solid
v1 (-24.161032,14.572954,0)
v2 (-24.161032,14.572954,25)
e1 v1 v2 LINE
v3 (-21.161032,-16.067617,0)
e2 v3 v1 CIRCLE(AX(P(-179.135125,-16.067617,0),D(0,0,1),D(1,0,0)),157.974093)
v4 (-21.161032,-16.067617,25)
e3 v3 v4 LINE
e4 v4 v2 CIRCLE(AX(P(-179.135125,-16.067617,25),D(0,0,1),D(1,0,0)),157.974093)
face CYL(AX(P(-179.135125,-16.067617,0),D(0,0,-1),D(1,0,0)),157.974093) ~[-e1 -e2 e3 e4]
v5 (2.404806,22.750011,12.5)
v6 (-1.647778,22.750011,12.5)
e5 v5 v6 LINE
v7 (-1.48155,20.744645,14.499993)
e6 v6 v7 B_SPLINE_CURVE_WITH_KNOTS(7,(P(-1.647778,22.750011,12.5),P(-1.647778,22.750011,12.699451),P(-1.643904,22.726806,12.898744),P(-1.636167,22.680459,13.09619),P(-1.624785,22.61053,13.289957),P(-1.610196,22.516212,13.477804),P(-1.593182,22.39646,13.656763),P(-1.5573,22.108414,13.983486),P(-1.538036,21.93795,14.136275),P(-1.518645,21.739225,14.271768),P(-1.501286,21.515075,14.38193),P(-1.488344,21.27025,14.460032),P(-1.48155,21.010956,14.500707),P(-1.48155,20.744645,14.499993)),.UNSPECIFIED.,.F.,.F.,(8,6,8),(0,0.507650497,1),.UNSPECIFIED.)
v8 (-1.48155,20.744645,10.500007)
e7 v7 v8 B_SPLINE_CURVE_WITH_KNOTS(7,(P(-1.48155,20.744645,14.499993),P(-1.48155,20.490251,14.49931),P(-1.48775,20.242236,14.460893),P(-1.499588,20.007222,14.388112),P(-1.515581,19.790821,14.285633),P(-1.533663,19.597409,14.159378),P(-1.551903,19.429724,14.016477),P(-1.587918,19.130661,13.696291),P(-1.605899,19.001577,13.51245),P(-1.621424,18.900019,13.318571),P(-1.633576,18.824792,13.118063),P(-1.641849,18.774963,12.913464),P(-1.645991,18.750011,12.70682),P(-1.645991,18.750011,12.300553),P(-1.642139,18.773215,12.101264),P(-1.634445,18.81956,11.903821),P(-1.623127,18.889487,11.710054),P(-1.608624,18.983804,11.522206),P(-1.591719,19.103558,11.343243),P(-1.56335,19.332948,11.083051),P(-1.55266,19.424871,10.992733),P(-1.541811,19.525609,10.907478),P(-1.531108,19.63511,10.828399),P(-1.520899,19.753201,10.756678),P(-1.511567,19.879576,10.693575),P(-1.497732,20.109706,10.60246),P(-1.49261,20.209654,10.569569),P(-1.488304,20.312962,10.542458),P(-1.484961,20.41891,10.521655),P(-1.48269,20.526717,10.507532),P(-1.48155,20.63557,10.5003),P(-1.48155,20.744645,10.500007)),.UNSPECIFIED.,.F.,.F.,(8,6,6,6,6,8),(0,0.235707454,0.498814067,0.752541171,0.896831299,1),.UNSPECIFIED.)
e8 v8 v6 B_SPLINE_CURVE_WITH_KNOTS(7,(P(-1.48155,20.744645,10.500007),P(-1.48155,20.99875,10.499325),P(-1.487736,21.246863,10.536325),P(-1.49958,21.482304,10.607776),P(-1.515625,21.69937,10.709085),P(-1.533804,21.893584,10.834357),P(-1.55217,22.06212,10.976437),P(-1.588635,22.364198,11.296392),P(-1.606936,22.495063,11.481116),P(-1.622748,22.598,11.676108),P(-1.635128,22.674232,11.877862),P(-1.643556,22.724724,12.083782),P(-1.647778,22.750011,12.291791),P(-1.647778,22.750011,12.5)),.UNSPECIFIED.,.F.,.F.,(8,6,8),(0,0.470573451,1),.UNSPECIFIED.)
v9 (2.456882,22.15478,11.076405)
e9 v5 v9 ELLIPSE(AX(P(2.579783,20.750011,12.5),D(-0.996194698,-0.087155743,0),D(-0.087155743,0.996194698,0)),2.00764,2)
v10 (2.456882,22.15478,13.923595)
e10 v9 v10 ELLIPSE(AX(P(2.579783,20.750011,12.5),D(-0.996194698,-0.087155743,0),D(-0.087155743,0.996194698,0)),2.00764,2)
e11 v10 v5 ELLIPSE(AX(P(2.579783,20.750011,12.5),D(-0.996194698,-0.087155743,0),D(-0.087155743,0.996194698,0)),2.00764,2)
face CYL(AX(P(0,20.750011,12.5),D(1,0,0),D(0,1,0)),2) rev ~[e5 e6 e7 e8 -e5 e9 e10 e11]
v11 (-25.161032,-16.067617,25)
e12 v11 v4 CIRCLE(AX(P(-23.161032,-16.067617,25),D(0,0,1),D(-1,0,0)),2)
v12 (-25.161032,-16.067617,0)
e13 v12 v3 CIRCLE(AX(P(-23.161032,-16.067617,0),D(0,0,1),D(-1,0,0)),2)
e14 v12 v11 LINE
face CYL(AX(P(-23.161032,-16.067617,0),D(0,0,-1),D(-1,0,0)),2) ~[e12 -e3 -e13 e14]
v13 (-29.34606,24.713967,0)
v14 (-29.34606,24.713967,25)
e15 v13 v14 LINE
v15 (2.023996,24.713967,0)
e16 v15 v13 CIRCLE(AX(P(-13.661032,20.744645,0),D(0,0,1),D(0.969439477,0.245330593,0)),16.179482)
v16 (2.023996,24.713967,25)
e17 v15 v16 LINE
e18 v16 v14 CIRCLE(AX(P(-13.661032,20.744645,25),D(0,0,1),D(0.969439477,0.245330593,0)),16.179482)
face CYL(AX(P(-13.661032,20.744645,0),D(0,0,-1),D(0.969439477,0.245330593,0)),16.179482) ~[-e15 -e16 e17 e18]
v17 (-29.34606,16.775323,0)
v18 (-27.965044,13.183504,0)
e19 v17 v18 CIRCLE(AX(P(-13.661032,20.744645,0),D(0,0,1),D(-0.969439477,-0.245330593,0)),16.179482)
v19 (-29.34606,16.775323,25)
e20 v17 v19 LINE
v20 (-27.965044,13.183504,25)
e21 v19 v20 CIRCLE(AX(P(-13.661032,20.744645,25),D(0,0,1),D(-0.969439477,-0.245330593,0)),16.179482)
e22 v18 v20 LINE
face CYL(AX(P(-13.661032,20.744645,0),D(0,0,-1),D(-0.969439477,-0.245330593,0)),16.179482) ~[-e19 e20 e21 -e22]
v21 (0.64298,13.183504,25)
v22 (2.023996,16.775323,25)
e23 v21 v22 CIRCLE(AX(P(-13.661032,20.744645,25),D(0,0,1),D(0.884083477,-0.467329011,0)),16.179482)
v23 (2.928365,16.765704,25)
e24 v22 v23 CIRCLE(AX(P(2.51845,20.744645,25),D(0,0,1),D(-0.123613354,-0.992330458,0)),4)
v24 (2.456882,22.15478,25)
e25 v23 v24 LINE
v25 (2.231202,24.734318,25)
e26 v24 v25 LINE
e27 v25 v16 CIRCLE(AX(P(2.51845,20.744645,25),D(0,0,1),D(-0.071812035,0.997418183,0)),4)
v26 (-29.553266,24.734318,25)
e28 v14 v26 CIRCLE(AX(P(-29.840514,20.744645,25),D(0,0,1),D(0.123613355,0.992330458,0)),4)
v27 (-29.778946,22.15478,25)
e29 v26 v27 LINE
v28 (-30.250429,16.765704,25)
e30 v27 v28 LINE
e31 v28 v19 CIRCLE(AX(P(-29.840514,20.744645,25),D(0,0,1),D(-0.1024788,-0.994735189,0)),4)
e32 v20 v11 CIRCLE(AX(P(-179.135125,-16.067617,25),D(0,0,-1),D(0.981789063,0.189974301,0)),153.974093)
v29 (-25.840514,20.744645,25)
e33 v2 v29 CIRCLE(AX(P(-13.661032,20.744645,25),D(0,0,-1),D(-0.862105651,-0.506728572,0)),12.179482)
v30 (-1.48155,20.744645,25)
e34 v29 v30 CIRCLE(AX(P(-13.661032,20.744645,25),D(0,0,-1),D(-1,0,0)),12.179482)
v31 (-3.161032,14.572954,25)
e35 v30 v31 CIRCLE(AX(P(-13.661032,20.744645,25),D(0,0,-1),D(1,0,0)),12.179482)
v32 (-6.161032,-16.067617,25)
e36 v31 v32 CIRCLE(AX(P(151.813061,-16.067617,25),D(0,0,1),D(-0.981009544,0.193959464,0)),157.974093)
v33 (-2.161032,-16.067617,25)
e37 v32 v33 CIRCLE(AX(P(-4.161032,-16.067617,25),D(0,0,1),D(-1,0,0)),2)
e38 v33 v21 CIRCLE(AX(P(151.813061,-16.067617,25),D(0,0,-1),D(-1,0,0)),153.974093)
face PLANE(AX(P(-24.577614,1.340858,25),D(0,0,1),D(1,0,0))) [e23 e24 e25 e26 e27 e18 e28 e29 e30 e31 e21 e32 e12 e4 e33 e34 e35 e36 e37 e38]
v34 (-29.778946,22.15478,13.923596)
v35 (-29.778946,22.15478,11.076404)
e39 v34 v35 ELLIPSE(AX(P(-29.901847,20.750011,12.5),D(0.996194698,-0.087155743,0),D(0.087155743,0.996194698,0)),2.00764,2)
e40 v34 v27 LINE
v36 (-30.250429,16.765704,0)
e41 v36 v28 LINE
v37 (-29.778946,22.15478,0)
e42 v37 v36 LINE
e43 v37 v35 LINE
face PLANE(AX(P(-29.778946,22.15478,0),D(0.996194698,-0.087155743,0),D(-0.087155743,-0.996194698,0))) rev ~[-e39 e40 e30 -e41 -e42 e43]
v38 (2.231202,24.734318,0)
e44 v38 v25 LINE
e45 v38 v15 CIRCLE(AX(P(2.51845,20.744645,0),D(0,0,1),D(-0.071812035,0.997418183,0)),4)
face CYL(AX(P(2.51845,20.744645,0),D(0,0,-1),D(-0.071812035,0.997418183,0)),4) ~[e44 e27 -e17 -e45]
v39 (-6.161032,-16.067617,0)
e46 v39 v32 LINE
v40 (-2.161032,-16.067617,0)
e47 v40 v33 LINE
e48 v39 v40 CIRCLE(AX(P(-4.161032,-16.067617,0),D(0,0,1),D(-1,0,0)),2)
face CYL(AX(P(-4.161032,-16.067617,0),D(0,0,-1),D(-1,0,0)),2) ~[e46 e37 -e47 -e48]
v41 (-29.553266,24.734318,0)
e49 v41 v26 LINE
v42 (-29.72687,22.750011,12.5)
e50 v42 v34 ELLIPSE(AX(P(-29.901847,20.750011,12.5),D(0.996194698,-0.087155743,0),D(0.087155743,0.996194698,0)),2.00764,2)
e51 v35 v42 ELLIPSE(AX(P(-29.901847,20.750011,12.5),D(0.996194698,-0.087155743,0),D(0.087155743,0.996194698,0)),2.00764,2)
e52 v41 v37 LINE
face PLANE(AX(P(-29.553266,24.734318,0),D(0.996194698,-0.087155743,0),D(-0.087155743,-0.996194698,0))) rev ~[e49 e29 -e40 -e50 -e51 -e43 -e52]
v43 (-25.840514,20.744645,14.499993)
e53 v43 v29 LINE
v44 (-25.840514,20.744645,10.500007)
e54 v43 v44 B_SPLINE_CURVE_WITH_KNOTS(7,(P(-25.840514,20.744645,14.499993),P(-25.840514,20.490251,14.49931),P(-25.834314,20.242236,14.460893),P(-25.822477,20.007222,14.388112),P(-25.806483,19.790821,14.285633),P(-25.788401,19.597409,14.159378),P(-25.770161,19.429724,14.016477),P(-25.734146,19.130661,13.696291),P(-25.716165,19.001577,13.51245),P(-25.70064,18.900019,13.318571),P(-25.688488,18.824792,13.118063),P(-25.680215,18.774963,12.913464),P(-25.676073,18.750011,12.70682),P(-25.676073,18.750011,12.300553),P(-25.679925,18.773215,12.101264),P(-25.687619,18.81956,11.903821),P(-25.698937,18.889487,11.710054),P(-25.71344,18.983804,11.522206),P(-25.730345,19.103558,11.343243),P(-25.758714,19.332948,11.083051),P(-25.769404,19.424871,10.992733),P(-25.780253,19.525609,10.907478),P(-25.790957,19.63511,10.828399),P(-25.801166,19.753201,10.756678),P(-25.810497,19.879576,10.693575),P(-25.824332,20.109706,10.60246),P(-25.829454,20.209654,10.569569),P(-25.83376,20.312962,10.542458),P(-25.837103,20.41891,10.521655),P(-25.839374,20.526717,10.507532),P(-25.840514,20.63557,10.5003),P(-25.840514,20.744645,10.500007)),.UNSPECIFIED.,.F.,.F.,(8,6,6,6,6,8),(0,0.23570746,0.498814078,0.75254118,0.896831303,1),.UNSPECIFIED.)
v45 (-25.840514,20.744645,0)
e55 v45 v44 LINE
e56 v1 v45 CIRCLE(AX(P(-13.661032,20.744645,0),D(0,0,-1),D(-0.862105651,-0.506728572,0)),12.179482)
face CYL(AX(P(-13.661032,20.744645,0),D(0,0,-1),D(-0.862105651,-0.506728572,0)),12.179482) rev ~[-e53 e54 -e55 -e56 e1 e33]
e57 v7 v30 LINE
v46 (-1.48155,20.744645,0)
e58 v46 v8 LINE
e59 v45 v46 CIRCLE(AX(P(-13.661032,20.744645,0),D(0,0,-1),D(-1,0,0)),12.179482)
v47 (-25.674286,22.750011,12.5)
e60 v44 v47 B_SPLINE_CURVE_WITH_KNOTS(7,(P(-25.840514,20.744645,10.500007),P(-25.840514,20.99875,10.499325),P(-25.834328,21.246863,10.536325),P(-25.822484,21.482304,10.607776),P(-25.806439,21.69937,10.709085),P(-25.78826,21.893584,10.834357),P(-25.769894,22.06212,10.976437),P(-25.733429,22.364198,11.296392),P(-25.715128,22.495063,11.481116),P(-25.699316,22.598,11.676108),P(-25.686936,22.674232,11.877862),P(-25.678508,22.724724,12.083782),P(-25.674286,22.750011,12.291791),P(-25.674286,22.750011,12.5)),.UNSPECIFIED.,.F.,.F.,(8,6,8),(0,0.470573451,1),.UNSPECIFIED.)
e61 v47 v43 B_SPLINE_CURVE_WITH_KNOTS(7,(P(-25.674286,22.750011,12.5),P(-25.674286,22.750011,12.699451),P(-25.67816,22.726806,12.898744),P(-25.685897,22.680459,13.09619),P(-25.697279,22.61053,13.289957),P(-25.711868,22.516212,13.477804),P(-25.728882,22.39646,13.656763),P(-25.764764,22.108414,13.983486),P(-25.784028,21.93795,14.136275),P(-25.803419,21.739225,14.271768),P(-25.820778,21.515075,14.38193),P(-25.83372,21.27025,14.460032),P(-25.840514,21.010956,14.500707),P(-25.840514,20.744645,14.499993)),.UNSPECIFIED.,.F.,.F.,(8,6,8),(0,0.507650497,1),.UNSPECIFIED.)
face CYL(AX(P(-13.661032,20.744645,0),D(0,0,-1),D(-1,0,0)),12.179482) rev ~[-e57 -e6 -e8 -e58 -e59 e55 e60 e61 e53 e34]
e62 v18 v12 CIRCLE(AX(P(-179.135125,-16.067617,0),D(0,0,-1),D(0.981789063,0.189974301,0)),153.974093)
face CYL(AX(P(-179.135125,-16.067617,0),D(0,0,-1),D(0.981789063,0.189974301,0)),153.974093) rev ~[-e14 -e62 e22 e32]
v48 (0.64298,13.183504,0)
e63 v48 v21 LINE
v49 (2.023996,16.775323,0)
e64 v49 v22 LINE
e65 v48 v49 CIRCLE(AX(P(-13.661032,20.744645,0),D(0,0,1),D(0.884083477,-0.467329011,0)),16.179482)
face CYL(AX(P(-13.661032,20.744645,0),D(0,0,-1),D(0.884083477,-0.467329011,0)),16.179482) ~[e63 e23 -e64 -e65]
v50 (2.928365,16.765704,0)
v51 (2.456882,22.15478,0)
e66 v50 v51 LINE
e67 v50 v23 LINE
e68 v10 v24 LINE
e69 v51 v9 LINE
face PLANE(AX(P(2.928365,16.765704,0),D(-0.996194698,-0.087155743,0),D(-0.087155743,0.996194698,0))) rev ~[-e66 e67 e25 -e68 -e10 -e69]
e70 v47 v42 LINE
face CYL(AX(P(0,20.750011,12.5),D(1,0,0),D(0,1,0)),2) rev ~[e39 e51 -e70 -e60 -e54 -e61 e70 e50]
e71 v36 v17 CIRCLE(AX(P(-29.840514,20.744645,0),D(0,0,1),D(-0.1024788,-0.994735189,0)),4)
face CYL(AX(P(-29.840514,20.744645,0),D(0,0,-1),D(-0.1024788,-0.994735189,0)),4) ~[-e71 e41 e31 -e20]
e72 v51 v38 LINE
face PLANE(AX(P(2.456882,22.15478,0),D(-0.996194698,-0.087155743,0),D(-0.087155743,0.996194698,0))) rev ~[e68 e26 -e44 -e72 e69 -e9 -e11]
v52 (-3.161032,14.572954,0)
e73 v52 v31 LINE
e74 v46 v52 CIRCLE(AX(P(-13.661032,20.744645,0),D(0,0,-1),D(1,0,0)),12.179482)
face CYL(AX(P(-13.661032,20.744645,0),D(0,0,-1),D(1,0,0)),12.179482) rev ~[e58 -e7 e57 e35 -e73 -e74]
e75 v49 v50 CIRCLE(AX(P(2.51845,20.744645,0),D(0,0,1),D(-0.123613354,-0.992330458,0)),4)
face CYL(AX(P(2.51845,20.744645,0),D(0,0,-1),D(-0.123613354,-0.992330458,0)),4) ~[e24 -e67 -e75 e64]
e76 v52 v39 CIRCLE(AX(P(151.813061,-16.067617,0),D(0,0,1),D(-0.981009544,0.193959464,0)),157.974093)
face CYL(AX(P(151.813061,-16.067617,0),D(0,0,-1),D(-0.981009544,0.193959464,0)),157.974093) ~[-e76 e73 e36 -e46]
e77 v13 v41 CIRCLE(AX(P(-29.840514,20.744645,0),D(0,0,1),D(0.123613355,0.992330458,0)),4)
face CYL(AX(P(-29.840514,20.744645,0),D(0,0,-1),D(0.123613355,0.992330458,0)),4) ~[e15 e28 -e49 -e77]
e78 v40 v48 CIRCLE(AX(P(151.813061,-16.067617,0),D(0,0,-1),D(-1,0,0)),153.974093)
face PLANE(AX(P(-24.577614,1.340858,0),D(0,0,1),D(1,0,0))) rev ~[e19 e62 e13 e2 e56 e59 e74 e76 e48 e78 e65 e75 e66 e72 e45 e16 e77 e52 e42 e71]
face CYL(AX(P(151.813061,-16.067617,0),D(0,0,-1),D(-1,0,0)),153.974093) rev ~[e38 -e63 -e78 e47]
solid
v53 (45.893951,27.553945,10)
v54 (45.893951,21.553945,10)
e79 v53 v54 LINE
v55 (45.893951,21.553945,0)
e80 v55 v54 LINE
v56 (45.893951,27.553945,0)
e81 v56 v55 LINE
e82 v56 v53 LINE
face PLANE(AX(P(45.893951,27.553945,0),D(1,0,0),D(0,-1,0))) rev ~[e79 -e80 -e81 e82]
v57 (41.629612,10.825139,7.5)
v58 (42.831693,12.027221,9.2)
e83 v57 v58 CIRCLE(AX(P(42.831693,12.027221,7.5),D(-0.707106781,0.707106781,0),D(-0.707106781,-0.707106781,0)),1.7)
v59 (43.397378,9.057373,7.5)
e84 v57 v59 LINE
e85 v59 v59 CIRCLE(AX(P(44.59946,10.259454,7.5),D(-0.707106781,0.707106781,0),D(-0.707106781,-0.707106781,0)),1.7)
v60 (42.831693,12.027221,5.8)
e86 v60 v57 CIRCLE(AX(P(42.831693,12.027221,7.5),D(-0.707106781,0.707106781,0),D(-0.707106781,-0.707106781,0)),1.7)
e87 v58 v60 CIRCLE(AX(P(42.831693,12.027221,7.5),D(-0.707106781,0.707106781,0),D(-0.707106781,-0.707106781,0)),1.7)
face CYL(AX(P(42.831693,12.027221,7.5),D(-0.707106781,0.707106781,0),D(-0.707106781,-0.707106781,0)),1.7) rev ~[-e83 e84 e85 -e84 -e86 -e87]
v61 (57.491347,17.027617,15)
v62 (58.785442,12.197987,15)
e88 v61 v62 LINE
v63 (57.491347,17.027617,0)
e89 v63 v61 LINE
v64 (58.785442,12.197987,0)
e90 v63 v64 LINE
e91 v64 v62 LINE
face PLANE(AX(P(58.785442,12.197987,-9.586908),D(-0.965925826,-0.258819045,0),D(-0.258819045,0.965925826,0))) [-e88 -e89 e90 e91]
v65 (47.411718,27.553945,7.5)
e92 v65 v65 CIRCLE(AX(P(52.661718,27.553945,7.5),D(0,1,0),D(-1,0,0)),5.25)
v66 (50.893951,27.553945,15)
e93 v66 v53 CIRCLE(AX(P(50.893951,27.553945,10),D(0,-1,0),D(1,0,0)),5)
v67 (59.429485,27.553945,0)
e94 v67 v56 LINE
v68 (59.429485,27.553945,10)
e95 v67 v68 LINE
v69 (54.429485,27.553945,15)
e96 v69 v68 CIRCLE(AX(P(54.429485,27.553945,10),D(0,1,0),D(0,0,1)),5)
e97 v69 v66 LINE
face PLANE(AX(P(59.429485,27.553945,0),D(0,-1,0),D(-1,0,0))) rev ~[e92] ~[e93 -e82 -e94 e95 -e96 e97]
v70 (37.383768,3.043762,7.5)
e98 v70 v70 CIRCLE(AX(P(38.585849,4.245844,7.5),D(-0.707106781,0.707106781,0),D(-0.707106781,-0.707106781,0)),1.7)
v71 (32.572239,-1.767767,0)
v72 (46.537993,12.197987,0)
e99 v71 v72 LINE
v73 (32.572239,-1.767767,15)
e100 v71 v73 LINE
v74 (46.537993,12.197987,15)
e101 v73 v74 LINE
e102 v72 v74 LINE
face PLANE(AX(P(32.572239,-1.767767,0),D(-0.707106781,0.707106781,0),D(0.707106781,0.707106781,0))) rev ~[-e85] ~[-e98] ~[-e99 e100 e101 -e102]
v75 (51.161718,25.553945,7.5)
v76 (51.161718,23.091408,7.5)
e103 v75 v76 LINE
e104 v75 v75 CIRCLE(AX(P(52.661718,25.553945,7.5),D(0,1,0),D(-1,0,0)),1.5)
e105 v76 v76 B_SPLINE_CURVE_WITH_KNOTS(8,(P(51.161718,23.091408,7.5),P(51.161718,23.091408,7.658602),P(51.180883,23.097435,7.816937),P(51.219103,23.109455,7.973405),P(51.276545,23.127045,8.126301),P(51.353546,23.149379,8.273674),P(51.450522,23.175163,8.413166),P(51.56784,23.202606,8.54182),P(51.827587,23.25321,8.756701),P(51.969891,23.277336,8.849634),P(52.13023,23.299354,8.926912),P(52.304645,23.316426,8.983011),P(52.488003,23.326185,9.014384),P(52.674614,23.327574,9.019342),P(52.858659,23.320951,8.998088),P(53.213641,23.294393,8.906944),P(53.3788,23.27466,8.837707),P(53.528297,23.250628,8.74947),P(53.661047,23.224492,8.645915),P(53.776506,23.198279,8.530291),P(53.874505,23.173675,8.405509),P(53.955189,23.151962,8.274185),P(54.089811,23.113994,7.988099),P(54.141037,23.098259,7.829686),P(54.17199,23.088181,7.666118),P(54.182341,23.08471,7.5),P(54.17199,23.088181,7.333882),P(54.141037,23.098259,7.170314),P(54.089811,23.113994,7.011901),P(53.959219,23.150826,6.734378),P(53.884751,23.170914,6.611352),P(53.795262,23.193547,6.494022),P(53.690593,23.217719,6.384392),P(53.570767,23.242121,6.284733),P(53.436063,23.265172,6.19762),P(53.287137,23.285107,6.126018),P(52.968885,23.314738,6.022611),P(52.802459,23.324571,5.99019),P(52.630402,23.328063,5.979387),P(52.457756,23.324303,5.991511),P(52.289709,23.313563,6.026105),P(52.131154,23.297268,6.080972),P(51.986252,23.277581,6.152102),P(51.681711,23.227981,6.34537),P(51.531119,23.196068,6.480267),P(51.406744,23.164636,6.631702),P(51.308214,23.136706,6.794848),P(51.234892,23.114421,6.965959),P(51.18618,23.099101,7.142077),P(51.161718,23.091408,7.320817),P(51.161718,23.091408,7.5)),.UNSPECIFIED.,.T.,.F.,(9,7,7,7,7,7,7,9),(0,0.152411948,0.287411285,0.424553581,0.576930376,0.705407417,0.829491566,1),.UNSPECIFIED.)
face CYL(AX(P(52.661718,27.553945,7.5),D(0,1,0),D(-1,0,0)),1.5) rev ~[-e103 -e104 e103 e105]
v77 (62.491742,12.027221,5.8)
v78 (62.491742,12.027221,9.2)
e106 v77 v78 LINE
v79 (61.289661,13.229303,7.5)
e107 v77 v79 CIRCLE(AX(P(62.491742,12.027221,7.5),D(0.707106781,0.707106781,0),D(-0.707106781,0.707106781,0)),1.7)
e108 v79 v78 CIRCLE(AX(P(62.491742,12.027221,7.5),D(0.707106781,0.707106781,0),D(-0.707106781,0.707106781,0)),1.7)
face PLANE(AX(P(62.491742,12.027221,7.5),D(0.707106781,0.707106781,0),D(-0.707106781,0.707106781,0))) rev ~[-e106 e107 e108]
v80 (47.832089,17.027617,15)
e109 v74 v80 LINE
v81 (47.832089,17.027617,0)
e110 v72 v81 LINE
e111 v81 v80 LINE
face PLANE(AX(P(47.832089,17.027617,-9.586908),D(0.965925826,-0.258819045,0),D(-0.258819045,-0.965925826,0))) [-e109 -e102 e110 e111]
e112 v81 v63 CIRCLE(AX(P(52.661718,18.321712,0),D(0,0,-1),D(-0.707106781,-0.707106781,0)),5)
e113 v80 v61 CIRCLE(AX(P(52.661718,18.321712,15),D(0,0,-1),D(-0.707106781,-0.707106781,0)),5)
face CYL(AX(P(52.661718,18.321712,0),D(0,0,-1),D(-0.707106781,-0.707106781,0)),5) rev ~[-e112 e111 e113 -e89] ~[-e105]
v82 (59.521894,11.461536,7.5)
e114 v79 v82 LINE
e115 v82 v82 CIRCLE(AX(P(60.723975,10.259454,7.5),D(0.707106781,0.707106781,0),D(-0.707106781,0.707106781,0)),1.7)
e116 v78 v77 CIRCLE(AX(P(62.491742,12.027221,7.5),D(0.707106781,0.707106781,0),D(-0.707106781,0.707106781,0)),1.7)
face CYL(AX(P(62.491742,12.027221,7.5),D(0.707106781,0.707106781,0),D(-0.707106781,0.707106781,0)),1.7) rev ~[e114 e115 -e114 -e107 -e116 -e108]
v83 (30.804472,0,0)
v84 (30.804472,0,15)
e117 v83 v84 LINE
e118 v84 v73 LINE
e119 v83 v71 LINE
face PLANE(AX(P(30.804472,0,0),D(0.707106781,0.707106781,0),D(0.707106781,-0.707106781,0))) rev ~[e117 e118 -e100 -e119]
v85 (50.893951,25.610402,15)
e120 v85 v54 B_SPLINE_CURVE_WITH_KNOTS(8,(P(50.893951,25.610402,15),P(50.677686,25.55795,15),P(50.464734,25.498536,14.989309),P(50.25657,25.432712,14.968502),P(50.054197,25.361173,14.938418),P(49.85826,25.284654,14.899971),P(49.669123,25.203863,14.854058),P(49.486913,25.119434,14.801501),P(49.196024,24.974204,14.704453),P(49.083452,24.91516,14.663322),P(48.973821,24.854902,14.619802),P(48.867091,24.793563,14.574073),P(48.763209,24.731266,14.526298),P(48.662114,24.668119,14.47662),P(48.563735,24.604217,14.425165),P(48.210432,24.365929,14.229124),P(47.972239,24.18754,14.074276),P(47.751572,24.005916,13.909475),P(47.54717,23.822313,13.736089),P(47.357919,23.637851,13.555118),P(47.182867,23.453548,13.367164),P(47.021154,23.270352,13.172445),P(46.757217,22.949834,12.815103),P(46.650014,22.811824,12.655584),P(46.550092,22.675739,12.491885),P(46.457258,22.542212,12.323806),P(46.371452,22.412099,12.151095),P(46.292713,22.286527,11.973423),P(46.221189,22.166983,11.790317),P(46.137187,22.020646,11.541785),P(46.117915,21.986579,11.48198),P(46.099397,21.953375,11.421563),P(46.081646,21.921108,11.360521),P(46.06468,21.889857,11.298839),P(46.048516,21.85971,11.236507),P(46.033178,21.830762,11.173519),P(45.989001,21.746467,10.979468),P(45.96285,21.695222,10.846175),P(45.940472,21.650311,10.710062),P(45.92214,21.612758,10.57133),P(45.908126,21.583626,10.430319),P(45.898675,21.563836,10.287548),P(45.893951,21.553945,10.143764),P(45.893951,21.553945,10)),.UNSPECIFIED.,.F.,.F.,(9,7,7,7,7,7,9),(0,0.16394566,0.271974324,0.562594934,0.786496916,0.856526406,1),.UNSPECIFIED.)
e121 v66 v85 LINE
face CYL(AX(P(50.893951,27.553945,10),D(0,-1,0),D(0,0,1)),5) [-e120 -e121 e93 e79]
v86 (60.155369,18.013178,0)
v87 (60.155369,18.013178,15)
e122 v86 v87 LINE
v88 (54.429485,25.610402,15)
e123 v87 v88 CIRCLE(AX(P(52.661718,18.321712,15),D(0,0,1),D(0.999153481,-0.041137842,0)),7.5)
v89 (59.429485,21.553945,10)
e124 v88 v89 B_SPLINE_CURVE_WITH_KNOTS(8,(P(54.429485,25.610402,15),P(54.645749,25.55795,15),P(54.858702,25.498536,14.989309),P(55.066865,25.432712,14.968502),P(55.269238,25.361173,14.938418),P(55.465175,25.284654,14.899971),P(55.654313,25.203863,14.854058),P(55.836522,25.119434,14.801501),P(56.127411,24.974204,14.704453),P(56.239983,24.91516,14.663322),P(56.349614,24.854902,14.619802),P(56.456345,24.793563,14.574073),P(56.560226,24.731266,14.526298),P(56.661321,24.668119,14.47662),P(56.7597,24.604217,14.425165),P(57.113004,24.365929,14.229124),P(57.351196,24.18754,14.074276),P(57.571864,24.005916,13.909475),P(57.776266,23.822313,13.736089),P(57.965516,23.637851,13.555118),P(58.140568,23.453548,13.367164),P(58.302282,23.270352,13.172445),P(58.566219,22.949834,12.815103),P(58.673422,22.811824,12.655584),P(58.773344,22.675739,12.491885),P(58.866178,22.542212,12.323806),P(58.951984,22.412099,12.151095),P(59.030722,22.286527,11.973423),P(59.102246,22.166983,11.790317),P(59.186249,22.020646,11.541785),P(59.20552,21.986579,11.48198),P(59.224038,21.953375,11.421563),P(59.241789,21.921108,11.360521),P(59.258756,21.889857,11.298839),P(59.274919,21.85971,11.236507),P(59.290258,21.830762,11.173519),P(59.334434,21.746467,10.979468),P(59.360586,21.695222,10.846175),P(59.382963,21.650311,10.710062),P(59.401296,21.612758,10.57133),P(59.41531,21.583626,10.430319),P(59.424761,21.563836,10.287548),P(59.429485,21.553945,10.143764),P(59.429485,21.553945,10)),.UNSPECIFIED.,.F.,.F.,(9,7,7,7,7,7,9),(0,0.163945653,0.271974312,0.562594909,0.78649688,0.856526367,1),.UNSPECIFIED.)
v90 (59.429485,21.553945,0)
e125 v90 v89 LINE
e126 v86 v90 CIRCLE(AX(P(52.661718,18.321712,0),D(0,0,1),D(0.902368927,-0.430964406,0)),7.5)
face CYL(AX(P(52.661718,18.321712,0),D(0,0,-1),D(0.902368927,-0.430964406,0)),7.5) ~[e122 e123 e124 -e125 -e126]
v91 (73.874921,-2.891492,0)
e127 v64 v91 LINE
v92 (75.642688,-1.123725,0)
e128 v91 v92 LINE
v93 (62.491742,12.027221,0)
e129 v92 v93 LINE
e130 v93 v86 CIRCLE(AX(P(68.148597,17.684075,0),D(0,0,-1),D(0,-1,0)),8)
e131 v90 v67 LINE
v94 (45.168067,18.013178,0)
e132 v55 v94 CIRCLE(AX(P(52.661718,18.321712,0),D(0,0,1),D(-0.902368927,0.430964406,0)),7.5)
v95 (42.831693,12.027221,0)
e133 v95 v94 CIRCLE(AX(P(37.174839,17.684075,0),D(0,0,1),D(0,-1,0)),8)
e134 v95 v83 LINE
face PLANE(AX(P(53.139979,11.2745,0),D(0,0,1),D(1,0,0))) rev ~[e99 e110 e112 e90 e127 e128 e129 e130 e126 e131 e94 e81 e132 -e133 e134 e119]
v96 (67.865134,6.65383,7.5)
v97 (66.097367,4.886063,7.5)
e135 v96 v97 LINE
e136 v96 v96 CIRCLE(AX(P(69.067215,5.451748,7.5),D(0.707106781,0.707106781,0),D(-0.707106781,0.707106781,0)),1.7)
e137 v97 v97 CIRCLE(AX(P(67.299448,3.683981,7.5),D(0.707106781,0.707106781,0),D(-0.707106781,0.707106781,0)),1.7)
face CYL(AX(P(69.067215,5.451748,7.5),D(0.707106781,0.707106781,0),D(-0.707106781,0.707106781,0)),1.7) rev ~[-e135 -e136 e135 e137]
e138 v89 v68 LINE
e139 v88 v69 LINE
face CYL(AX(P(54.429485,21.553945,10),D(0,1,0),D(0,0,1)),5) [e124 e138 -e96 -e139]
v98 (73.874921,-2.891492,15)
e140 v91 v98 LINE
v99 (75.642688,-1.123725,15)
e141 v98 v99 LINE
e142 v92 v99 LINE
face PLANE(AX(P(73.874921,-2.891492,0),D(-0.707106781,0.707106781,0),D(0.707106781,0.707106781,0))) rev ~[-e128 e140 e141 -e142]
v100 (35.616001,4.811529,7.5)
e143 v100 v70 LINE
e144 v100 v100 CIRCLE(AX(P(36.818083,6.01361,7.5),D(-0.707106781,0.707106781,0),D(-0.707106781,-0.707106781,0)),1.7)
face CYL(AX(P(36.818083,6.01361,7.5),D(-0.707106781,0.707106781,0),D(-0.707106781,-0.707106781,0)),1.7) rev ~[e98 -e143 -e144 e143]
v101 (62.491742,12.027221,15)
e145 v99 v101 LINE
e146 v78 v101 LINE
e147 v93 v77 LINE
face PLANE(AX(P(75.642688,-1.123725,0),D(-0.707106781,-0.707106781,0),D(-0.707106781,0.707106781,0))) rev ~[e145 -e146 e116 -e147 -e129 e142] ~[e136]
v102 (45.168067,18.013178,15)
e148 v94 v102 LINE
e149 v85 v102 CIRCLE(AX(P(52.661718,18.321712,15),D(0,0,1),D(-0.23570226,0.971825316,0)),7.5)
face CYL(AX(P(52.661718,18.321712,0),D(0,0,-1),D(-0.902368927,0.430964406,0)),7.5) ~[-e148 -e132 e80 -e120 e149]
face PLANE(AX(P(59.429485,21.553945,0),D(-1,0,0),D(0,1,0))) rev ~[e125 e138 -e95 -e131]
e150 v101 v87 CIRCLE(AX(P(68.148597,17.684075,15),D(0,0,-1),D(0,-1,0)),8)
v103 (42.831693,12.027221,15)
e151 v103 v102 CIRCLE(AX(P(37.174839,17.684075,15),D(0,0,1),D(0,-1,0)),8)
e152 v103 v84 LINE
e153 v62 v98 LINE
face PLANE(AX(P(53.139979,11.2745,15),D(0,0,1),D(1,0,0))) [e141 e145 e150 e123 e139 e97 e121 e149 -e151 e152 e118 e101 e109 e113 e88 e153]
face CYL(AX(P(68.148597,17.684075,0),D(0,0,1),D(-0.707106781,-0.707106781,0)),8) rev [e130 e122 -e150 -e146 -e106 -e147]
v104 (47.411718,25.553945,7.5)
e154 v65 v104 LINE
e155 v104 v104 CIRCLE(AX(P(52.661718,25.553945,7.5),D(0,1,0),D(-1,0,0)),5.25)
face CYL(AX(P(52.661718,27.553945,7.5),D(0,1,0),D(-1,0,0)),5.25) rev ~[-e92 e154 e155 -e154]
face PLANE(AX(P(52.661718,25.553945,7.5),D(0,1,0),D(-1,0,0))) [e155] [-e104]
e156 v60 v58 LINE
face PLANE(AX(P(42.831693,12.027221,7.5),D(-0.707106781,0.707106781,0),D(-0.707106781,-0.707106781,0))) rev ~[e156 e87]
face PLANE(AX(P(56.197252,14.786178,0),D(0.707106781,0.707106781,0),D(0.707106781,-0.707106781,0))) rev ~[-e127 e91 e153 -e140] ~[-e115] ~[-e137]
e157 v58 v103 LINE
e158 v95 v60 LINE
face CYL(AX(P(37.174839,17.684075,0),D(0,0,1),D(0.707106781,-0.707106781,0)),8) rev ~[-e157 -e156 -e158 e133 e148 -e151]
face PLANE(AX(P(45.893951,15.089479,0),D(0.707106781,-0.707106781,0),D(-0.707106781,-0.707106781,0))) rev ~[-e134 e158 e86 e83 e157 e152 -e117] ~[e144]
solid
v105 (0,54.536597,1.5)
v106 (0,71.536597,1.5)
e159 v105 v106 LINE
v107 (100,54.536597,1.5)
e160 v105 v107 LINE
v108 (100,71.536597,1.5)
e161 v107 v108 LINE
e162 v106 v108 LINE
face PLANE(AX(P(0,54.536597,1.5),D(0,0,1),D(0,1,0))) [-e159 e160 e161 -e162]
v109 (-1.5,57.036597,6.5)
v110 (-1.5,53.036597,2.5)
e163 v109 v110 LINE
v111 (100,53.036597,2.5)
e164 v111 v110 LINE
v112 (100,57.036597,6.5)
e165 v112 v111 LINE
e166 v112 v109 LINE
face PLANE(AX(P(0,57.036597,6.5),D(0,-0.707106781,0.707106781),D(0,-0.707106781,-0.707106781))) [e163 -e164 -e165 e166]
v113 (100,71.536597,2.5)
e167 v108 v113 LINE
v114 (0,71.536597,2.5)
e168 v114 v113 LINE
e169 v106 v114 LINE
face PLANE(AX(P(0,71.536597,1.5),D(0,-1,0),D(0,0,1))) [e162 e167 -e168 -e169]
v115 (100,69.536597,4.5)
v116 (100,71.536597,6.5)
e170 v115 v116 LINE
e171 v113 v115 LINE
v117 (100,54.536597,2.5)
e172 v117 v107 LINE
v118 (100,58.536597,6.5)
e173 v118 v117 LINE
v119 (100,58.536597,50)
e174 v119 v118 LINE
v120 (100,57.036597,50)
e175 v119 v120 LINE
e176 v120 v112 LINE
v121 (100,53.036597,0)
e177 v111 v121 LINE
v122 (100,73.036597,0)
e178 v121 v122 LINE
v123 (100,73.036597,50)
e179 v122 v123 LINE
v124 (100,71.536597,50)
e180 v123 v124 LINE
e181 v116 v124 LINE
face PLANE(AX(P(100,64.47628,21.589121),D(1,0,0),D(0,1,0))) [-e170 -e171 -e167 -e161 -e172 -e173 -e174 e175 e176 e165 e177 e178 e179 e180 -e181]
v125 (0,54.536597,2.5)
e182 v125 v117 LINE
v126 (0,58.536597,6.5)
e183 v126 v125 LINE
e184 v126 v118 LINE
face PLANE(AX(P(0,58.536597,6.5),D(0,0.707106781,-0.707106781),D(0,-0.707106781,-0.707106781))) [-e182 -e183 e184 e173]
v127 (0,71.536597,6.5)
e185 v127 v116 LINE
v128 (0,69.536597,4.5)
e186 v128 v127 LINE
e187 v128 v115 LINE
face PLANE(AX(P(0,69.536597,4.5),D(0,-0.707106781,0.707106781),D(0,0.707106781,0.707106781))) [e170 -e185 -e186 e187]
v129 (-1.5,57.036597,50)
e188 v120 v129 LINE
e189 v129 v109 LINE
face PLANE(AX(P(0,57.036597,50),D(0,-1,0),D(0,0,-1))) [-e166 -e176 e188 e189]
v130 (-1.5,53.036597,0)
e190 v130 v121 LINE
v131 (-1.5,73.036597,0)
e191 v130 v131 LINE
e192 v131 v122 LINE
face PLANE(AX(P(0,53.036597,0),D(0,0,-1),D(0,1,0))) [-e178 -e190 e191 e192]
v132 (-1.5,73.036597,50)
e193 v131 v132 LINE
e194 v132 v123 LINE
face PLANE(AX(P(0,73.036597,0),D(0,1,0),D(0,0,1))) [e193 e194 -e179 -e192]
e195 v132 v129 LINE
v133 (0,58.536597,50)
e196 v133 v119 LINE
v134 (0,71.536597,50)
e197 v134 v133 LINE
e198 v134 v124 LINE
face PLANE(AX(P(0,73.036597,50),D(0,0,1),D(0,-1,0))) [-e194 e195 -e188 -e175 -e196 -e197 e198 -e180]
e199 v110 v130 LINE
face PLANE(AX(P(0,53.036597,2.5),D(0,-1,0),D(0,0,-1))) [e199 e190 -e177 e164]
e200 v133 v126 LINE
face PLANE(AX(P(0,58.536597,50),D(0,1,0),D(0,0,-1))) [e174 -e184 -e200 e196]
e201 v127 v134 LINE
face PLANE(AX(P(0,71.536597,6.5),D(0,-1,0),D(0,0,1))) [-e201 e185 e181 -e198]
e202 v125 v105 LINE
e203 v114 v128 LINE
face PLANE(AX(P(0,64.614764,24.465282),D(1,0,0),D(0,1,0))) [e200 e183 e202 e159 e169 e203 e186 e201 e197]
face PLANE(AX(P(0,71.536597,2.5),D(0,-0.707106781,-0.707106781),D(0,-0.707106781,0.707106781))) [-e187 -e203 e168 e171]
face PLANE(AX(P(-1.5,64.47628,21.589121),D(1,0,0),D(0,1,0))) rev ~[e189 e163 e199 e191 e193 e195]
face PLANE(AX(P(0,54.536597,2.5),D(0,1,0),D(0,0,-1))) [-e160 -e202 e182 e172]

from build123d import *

# Parameters (mm, degrees)
F1_DEPTH         = 25
F2_R             = 2
F3_DEPTH         = 50
F3_DEPTH_BACK    = 25
F5_DEPTH         = 15
F6_R             = 5.25
F6_R_2           = 1.5
F7_DEPTH         = 2
F8_DEPTH         = 4.4635371399
F9_R             = 8
F10_T1_DEPTH     = 34.1738160091
F11_R            = 5
F14_D            = 3.4
F14_DEPTH        = 33.751
F14_ON_F12_D     = 3.4
F14_ON_F12_DEPTH = 32.9564066504
F16_DEPTH        = 100
F16_DEPTH_BACK   = 1.5
F17_DEPTH        = 100


# Not quite as in the source:
# - a fillet or chamfer that OpenCascade refuses, or shapes differently, is made with other operations: its cross-section is extruded or revolved along the edge and cut away or added


with BuildPart() as f1:
    # F0 (on Top) → F1 (new body)
    with BuildSketch(Plane.XY):
        with BuildLine():
            ThreePointArc((-24.161032021, 14.5729538053), (-25.4131452814, 17.5465819672), (-25.8405137163, 20.7446451753))
            ThreePointArc((-25.8405137163, 20.7446451753), (-26.8423631476, 18.0967982826), (-29.3460602999, 16.7753233416))
            ThreePointArc((-29.3460602999, 16.7753233416), (-28.7627184296, 14.9382094746), (-27.9650444616, 13.1835039897))
            ThreePointArc((-27.9650444616, 13.1835039897), (-25.8636381782, -1.3750118355), (-25.161032021, -16.0676166415))
            ThreePointArc((-25.161032021, -16.0676166415), (-23.161032021, -18.0676166415), (-21.161032021, -16.0676166415))
            ThreePointArc((-21.161032021, -16.0676166415), (-21.9128208792, -0.6740745109), (-24.161032021, 14.5729538053))
        make_face()
        with BuildLine():
            ThreePointArc((2.0239962578, 16.7753233416), (-0.4797008945, 18.0967982826), (-1.4815503258, 20.7446451753))
            ThreePointArc((-1.4815503258, 20.7446451753), (-1.9089187607, 17.5465819672), (-3.161032021, 14.5729538053))
            ThreePointArc((-3.161032021, 14.5729538053), (-5.4092431629, -0.6740745109), (-6.161032021, -16.0676166415))
            ThreePointArc((-6.161032021, -16.0676166415), (-4.161032021, -18.0676166415), (-2.161032021, -16.0676166415))
            ThreePointArc((-2.161032021, -16.0676166415), (-1.4584258639, -1.3750118355), (0.6429804195, 13.1835039897))
            ThreePointArc((0.6429804195, 13.1835039897), (1.4406543875, 14.9382094746), (2.0239962578, 16.7753233416))
        make_face()
        with BuildLine():
            ThreePointArc((-29.3460602999, 24.7139670089), (-26.8423631476, 23.392492068), (-25.8405137163, 20.7446451753))
            ThreePointArc((-25.8405137163, 20.7446451753), (-13.661032021, 32.9241268706), (-1.4815503258, 20.7446451753))
            ThreePointArc((-1.4815503258, 20.7446451753), (-0.4797008945, 23.392492068), (2.0239962578, 24.7139670089))
            ThreePointArc((2.0239962578, 24.7139670089), (-13.661032021, 36.9241268706), (-29.3460602999, 24.7139670089))
        make_face()
        with BuildLine():
            ThreePointArc((2.2312015307, 24.7343179067), (2.1274664624, 24.7254908302), (2.0239962578, 24.7139670089))
            ThreePointArc((2.0239962578, 24.7139670089), (2.2918404856, 23.4430681803), (2.4568818303, 22.1547802787))
            Line((2.4568818303, 22.1547802787), (2.2312015307, 24.7343179067))
        make_face()
        with BuildLine():
            ThreePointArc((-29.7789459209, 22.1547797242), (-29.6139045741, 23.4430679059), (-29.3460602999, 24.7139670089))
            ThreePointArc((-29.3460602999, 24.7139670089), (-29.4495305044, 24.7254908302), (-29.5532655728, 24.7343179067))
            Line((-29.5532655728, 24.7343179067), (-29.7789459209, 22.1547797242))
        make_face()
        with BuildLine():
            ThreePointArc((-30.2504289168, 16.7657044207), (-29.7979718734, 16.7448714077), (-29.3460602999, 16.7753233416))
            ThreePointArc((-29.3460602999, 16.7753233416), (-29.7883820994, 19.4468750185), (-29.7789459209, 22.1547797242))
            Line((-29.7789459209, 22.1547797242), (-30.2504289168, 16.7657044207))
        make_face()
        with BuildLine():
            ThreePointArc((2.4568818303, 22.1547802787), (2.4663180796, 19.4468752959), (2.0239962578, 16.7753233416))
            ThreePointArc((2.0239962578, 16.7753233416), (2.4759078313, 16.7448714077), (2.9283648747, 16.7657044207))
            Line((2.9283648747, 16.7657044207), (2.4568818303, 22.1547802787))
        make_face()
        with BuildLine():
            ThreePointArc((2.0239962578, 24.7139670089), (-0.4797008945, 23.392492068), (-1.4815503258, 20.7446451753))
            ThreePointArc((-1.4815503258, 20.7446451753), (-0.4797008945, 18.0967982826), (2.0239962578, 16.7753233416))
            ThreePointArc((2.0239962578, 16.7753233416), (2.4663180796, 19.4468752959), (2.4568818303, 22.1547802787))
            ThreePointArc((2.4568818303, 22.1547802787), (2.2918404856, 23.4430681803), (2.0239962578, 24.7139670089))
        make_face()
        with BuildLine():
            ThreePointArc((-29.3460602999, 16.7753233416), (-26.8423631476, 18.0967982826), (-25.8405137163, 20.7446451753))
            ThreePointArc((-25.8405137163, 20.7446451753), (-26.8423631476, 23.392492068), (-29.3460602999, 24.7139670089))
            ThreePointArc((-29.3460602999, 24.7139670089), (-29.6139045741, 23.4430679059), (-29.7789459209, 22.1547797242))
            ThreePointArc((-29.7789459209, 22.1547797242), (-29.7883820994, 19.4468750185), (-29.3460602999, 16.7753233416))
        make_face()
    extrude(amount=F1_DEPTH)

    # F2 (on Right) → F3 (cut, two sides)
    with BuildSketch(Plane.YZ) as f3_sk:
        with Locations((20.7500111637, 12.5)):
            Circle(F2_R)
    extrude(amount=-F3_DEPTH, mode=Mode.SUBTRACT)
    extrude(f3_sk.sketch, amount=F3_DEPTH_BACK, mode=Mode.SUBTRACT)


with BuildPart() as f5:
    # F4 (on Top) → F5 (new body)
    with BuildSketch(Plane.XY):
        with BuildLine():
            Line((30.8044720441, 0), (32.5722389971, -1.767766953))
            Line((32.5722389971, -1.767766953), (49.1261838352, 14.7861778852))
            ThreePointArc((49.1261838352, 14.7861778852), (52.6617177411, 23.3217117911), (56.1972516471, 14.7861778852))
            Line((56.1972516471, 14.7861778852), (73.8749211767, -2.8914916445))
            Line((73.8749211767, -2.8914916445), (75.6426881297, -1.1237246915))
            Line((75.6426881297, -1.1237246915), (59.4294846941, 15.0894787441))
            ThreePointArc((59.4294846941, 15.0894787441), (60.1617177411, 18.3217117911), (59.4294846941, 21.5539448381))
            ThreePointArc((59.4294846941, 21.5539448381), (56.6622334671, 24.6656753728), (52.6617177411, 25.8217117911))
            ThreePointArc((52.6617177411, 25.8217117911), (48.6612020152, 24.6656753728), (45.8939507882, 21.5539448381))
            ThreePointArc((45.8939507882, 21.5539448381), (45.1617177411, 18.3217117911), (45.8939507882, 15.0894787441))
            Line((45.8939507882, 15.0894787441), (30.8044720441, 0))
        make_face()
        with BuildLine():
            Line((45.8939507882, 25.8217117911), (45.8939507882, 21.5539448381))
            ThreePointArc((45.8939507882, 21.5539448381), (48.6612020152, 24.6656753728), (52.6617177411, 25.8217117911))
            Line((52.6617177411, 25.8217117911), (45.8939507882, 25.8217117911))
        make_face()
        with BuildLine():
            Line((45.8939507882, 25.8217117911), (52.6617177411, 25.8217117911))
            ThreePointArc((52.6617177411, 25.8217117911), (56.6622334671, 24.6656753728), (59.4294846941, 21.5539448381))
            Line((59.4294846941, 21.5539448381), (59.4294846941, 27.5539448381))
            Line((59.4294846941, 27.5539448381), (45.8939507882, 27.5539448381))
            Line((45.8939507882, 27.5539448381), (45.8939507882, 25.8217117911))
        make_face()
    extrude(amount=F5_DEPTH)

    # F6 (on face) → F7 (cut)
    with BuildSketch(Plane(origin=(0, 27.5539448381, 0), x_dir=(-1, 0, 0), z_dir=(0, 1, 0))):
        with Locations((-52.6617177411, 7.5)):
            Circle(F6_R)
        with Locations((-52.6617177411, 7.5)):
            Circle(F6_R_2, mode=Mode.SUBTRACT)
    extrude(amount=-F7_DEPTH, mode=Mode.SUBTRACT)

    # F8 (cut, through all): a face of the model
    f8_faces = [f5.faces().sort_by_distance(p)[0] for p in [
        (52.6617177411, 27.5539448381, 7.5),
    ]]
    extrude(f8_faces, amount=-F8_DEPTH, mode=Mode.SUBTRACT)

    # F9
    f9_edges = [f5.edges().sort_by_distance(p)[0] for p in [
        (59.429485, 15.089479, 7.5),
        (45.893951, 15.089479, 7.5),
    ]]
    fillet(f9_edges, radius=F9_R)

    # F10: chamfer of 5 on 2 edges, made by hand

    # F10_s2 → F10_t1 (cut)
    with BuildSketch(Plane.XY.offset(-9.5869080045)):
        with BuildLine():
            Line((58.7854420981, 12.1979874341), (57.4913468726, 17.0276165656))
            ThreePointArc((57.4913468726, 17.0276165656), (57.0285091449, 15.8863200699), (56.1972516471, 14.7861778852))
            Line((56.1972516471, 14.7861778852), (58.7854420981, 12.1979874341))
        make_face()
        with BuildLine():
            Line((47.8320886097, 17.0276165656), (46.5379933842, 12.1979874341))
            Line((46.5379933842, 12.1979874341), (49.1261838352, 14.7861778852))
            ThreePointArc((49.1261838352, 14.7861778852), (48.2949263373, 15.8863200699), (47.8320886097, 17.0276165656))
        make_face()
    extrude(amount=F10_T1_DEPTH, mode=Mode.SUBTRACT)

    # F11
    f11_edges = [f5.edges().sort_by_distance(p)[0] for p in [
        (45.893951, 24.553945, 15),
        (59.429485, 24.553945, 15),
    ]]
    fillet(f11_edges, radius=F11_R)

    # F14 (through all, one way)
    with BuildSketch(Plane(origin=(15.4022360221, -15.4022360221, 0), x_dir=(-0.7071067812, -0.7071067812, 0), z_dir=(-0.7071067812, 0.7071067812, 0))):
        with Locations((-38.7911101231, 7.5), (-30.2865805982, 7.5)):
            Circle(F14_D / 2)
    extrude(amount=-F14_DEPTH, mode=Mode.SUBTRACT)

    # F14 on F12 (through all, one way)
    with BuildSketch(Plane(origin=(37.2594817191, 37.2594817191, 0), x_dir=(-0.7071067812, 0.7071067812, 0), z_dir=(0.7071067812, 0.7071067812, 0))):
        with Locations((-35.6838053243, 7.5), (-44.9829281988, 7.5)):
            Circle(F14_ON_F12_D / 2)
    extrude(amount=-F14_ON_F12_DEPTH, mode=Mode.SUBTRACT)


with BuildPart() as f16:
    # F15 (on Right) → F16 (new body, two sides)
    with BuildSketch(Plane.YZ) as f16_sk:
        Polygon((53.036596626, 2.5), (53.036596626, 0), (73.036596626, 0), (73.036596626, 50), (71.536596626, 50), (71.536596626, 6.5), (71.536596626, 4.5), (71.536596626, 2.5), (71.536596626, 1.5), (54.536596626, 1.5), (54.536596626, 2.5), (56.536596626, 4.5), (58.536596626, 6.5), (58.536596626, 50), (57.036596626, 50), (57.036596626, 6.5), align=None)
        Polygon((71.536596626, 4.5), (71.536596626, 6.5), (69.536596626, 4.5), align=None)
        Polygon((71.536596626, 2.5), (71.536596626, 4.5), (69.536596626, 4.5), align=None)
        Polygon((71.536596626, 6.5), (71.536596626, 50), (58.536596626, 50), (58.536596626, 6.5), (56.536596626, 4.5), (54.536596626, 2.5), (54.536596626, 1.5), (71.536596626, 1.5), (71.536596626, 2.5), (69.536596626, 4.5), align=None)
    extrude(amount=F16_DEPTH)
    extrude(f16_sk.sketch, amount=-F16_DEPTH_BACK)

    # F15 (on Right) → F17 (cut)
    with BuildSketch(Plane.YZ):
        Polygon((71.536596626, 6.5), (71.536596626, 50), (58.536596626, 50), (58.536596626, 6.5), (56.536596626, 4.5), (54.536596626, 2.5), (54.536596626, 1.5), (71.536596626, 1.5), (71.536596626, 2.5), (69.536596626, 4.5), align=None)
    extrude(amount=F17_DEPTH, mode=Mode.SUBTRACT)


solid = Compound([f1.part, f5.part, f16.part])
